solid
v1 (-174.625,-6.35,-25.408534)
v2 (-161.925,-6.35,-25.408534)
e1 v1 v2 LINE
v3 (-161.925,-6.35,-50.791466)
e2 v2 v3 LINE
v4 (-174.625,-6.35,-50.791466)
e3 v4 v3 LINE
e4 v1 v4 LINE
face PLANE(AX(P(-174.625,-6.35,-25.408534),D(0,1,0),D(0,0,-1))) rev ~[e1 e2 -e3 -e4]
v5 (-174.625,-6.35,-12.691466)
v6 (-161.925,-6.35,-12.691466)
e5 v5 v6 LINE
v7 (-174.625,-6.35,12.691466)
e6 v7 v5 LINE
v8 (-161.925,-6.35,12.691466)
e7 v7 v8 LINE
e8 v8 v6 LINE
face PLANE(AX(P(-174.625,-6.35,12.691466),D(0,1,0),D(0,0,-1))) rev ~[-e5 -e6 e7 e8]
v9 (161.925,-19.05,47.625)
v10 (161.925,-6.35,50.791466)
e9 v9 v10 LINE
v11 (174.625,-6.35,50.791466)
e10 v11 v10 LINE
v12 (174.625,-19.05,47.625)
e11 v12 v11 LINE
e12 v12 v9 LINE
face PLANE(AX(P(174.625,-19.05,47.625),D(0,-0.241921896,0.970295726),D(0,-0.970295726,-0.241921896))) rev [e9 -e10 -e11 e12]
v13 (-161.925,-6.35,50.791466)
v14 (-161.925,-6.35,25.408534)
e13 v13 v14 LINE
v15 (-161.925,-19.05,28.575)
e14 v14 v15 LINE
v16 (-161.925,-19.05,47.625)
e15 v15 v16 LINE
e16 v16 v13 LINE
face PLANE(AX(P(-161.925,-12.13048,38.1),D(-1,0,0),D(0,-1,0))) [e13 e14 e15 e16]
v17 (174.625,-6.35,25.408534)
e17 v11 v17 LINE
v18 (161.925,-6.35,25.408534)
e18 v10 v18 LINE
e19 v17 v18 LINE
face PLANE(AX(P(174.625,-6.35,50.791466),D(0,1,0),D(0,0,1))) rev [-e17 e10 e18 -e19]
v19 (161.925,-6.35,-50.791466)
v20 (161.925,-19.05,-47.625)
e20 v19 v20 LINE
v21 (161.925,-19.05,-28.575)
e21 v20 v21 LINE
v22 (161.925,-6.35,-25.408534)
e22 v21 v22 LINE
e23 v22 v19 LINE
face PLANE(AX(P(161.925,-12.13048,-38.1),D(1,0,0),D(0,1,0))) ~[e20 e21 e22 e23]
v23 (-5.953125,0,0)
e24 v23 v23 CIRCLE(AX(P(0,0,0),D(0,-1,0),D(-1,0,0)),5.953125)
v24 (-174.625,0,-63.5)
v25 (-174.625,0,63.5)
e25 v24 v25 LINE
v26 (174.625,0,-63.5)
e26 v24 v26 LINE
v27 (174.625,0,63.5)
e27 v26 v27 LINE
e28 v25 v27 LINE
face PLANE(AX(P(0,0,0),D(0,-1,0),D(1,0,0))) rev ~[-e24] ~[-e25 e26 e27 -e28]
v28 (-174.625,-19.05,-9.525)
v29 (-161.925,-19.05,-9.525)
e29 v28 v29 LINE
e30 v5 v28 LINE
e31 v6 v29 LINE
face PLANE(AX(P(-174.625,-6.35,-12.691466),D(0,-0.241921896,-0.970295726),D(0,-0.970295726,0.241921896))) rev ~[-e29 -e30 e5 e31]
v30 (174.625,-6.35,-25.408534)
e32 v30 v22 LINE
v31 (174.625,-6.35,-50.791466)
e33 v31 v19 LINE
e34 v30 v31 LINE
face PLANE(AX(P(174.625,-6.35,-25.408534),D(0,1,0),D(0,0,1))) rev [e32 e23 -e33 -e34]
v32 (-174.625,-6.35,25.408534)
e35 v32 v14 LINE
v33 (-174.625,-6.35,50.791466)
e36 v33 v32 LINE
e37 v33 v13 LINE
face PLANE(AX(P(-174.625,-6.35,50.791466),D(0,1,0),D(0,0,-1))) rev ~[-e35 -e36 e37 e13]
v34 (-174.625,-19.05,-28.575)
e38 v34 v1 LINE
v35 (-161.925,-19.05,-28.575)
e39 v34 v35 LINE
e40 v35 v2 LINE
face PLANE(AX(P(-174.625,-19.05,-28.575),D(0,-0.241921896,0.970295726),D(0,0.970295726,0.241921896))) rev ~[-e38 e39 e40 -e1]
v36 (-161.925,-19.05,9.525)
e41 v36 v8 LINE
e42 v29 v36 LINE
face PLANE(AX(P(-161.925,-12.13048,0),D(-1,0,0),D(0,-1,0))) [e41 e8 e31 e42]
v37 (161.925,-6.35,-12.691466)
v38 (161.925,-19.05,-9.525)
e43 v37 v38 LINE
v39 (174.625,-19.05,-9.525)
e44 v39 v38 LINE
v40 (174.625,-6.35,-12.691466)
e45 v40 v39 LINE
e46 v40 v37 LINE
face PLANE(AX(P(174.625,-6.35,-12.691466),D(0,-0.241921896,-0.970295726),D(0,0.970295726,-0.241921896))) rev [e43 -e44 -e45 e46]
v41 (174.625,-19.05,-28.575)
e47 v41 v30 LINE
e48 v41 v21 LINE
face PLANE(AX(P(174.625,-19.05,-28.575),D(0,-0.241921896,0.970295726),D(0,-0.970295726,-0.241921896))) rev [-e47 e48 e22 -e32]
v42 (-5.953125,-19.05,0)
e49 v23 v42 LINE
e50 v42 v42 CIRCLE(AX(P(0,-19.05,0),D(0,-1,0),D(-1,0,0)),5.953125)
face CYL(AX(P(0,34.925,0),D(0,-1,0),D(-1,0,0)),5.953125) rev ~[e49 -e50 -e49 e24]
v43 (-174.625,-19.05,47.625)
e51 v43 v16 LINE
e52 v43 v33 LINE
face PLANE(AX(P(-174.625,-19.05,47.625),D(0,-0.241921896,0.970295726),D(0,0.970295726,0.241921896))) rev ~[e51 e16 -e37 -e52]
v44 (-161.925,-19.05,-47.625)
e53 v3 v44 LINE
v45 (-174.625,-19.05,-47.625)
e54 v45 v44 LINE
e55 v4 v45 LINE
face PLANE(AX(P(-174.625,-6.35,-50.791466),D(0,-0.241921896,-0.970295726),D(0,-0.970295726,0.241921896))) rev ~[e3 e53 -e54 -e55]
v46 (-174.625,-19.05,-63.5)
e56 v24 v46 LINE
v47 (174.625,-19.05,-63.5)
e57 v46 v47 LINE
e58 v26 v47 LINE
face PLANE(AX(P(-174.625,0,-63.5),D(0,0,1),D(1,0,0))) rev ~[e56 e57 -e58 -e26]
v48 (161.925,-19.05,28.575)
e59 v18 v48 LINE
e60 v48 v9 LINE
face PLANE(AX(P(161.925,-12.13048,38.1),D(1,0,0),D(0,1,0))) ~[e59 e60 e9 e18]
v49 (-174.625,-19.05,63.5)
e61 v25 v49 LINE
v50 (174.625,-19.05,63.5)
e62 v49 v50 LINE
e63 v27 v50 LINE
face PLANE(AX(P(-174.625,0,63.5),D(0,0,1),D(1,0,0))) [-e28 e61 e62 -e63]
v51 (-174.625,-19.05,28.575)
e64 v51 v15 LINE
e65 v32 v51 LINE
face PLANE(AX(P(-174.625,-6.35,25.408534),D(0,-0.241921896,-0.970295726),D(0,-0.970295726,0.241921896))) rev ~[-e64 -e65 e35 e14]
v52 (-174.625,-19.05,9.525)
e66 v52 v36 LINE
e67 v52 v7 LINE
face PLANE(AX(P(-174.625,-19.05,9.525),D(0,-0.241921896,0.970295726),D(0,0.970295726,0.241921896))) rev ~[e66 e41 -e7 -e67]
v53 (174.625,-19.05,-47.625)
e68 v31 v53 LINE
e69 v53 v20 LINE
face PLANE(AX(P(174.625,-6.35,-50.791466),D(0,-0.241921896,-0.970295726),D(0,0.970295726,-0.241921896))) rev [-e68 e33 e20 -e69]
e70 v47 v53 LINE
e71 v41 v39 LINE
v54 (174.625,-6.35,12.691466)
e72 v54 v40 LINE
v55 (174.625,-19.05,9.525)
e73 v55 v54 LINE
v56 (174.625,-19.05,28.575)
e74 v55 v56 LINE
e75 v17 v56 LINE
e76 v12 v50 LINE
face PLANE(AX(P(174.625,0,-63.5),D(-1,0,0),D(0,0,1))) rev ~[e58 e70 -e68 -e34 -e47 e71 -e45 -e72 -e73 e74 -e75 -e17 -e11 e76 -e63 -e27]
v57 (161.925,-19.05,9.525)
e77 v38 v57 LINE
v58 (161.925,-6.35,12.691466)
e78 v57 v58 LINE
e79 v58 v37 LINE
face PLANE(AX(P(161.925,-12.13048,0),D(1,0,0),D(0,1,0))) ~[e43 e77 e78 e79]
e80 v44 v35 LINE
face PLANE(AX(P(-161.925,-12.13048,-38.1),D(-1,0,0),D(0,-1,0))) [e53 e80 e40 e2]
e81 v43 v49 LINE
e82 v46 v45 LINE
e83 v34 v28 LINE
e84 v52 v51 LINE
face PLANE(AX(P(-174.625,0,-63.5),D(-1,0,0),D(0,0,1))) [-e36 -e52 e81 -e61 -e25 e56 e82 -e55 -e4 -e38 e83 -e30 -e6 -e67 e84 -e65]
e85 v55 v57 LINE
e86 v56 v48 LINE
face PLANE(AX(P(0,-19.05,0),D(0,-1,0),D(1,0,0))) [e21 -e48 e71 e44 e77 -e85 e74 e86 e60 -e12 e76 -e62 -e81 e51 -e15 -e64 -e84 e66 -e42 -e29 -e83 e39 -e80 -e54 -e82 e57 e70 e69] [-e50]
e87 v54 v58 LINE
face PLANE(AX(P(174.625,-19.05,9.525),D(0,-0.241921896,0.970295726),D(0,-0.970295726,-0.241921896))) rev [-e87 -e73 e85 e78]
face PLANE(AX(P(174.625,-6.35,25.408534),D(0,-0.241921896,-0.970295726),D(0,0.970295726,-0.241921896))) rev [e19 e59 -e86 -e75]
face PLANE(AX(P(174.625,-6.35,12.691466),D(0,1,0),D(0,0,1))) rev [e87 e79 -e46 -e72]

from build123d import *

# Parameters (mm, degrees)
F0_W     = 349.25
F0_H     = 127
F1_DEPTH = 19.05
F3_DEPTH = 12.7
F4_D     = 11.90625
F4_DEPTH = 34.925
F4_TIP   = 3.5769983726


# Not quite as in the source:
# - a pattern or mirror of a feature is missing from the dataset's text; its kind, count and spacing are read off the source's solid


with BuildPart() as f1:
    # F0 (on Front) → F1 (new body)
    with BuildSketch(Plane.XZ):
        Rectangle(F0_W, F0_H)
    extrude(amount=F1_DEPTH)

    # F2 (on face) → F3 (cut)
    with BuildSketch(Plane(origin=(-174.625, 0, 0), x_dir=(0, -1, 0), z_dir=(-1, 0, 0))):
        Polygon((19.05, -47.625), (19.05, -28.575), (6.35, -25.4085343639), (6.35, -50.7914656361), align=None)
        Polygon((19.05, -9.525), (19.05, 9.525), (6.35, 12.6914656361), (6.35, -12.6914656361), align=None)
        Polygon((19.05, 28.575), (19.05, 47.625), (6.35, 50.7914656361), (6.35, 25.4085343639), align=None)
    f3 = extrude(amount=-F3_DEPTH, mode=Mode.SUBTRACT)

    # F3_copies: F3 across plane
    add(f3.mirror(Plane(origin=(0, 0, 0), x_dir=(0, 0, 1), z_dir=(1, 0, 0))), mode=Mode.SUBTRACT)

    # F4
    with Locations(Plane(origin=(0, 0, 0), x_dir=(1, 0, 0), z_dir=(0, 1, 0))):
        with Locations((0, 0)):
            Hole(F4_D / 2, depth=F4_DEPTH)
            with Locations((0, 0, -(F4_DEPTH + F4_TIP / 2))):  # 118° drill point
                Cone(0, F4_D / 2, F4_TIP, mode=Mode.SUBTRACT)


solid = f1.part
